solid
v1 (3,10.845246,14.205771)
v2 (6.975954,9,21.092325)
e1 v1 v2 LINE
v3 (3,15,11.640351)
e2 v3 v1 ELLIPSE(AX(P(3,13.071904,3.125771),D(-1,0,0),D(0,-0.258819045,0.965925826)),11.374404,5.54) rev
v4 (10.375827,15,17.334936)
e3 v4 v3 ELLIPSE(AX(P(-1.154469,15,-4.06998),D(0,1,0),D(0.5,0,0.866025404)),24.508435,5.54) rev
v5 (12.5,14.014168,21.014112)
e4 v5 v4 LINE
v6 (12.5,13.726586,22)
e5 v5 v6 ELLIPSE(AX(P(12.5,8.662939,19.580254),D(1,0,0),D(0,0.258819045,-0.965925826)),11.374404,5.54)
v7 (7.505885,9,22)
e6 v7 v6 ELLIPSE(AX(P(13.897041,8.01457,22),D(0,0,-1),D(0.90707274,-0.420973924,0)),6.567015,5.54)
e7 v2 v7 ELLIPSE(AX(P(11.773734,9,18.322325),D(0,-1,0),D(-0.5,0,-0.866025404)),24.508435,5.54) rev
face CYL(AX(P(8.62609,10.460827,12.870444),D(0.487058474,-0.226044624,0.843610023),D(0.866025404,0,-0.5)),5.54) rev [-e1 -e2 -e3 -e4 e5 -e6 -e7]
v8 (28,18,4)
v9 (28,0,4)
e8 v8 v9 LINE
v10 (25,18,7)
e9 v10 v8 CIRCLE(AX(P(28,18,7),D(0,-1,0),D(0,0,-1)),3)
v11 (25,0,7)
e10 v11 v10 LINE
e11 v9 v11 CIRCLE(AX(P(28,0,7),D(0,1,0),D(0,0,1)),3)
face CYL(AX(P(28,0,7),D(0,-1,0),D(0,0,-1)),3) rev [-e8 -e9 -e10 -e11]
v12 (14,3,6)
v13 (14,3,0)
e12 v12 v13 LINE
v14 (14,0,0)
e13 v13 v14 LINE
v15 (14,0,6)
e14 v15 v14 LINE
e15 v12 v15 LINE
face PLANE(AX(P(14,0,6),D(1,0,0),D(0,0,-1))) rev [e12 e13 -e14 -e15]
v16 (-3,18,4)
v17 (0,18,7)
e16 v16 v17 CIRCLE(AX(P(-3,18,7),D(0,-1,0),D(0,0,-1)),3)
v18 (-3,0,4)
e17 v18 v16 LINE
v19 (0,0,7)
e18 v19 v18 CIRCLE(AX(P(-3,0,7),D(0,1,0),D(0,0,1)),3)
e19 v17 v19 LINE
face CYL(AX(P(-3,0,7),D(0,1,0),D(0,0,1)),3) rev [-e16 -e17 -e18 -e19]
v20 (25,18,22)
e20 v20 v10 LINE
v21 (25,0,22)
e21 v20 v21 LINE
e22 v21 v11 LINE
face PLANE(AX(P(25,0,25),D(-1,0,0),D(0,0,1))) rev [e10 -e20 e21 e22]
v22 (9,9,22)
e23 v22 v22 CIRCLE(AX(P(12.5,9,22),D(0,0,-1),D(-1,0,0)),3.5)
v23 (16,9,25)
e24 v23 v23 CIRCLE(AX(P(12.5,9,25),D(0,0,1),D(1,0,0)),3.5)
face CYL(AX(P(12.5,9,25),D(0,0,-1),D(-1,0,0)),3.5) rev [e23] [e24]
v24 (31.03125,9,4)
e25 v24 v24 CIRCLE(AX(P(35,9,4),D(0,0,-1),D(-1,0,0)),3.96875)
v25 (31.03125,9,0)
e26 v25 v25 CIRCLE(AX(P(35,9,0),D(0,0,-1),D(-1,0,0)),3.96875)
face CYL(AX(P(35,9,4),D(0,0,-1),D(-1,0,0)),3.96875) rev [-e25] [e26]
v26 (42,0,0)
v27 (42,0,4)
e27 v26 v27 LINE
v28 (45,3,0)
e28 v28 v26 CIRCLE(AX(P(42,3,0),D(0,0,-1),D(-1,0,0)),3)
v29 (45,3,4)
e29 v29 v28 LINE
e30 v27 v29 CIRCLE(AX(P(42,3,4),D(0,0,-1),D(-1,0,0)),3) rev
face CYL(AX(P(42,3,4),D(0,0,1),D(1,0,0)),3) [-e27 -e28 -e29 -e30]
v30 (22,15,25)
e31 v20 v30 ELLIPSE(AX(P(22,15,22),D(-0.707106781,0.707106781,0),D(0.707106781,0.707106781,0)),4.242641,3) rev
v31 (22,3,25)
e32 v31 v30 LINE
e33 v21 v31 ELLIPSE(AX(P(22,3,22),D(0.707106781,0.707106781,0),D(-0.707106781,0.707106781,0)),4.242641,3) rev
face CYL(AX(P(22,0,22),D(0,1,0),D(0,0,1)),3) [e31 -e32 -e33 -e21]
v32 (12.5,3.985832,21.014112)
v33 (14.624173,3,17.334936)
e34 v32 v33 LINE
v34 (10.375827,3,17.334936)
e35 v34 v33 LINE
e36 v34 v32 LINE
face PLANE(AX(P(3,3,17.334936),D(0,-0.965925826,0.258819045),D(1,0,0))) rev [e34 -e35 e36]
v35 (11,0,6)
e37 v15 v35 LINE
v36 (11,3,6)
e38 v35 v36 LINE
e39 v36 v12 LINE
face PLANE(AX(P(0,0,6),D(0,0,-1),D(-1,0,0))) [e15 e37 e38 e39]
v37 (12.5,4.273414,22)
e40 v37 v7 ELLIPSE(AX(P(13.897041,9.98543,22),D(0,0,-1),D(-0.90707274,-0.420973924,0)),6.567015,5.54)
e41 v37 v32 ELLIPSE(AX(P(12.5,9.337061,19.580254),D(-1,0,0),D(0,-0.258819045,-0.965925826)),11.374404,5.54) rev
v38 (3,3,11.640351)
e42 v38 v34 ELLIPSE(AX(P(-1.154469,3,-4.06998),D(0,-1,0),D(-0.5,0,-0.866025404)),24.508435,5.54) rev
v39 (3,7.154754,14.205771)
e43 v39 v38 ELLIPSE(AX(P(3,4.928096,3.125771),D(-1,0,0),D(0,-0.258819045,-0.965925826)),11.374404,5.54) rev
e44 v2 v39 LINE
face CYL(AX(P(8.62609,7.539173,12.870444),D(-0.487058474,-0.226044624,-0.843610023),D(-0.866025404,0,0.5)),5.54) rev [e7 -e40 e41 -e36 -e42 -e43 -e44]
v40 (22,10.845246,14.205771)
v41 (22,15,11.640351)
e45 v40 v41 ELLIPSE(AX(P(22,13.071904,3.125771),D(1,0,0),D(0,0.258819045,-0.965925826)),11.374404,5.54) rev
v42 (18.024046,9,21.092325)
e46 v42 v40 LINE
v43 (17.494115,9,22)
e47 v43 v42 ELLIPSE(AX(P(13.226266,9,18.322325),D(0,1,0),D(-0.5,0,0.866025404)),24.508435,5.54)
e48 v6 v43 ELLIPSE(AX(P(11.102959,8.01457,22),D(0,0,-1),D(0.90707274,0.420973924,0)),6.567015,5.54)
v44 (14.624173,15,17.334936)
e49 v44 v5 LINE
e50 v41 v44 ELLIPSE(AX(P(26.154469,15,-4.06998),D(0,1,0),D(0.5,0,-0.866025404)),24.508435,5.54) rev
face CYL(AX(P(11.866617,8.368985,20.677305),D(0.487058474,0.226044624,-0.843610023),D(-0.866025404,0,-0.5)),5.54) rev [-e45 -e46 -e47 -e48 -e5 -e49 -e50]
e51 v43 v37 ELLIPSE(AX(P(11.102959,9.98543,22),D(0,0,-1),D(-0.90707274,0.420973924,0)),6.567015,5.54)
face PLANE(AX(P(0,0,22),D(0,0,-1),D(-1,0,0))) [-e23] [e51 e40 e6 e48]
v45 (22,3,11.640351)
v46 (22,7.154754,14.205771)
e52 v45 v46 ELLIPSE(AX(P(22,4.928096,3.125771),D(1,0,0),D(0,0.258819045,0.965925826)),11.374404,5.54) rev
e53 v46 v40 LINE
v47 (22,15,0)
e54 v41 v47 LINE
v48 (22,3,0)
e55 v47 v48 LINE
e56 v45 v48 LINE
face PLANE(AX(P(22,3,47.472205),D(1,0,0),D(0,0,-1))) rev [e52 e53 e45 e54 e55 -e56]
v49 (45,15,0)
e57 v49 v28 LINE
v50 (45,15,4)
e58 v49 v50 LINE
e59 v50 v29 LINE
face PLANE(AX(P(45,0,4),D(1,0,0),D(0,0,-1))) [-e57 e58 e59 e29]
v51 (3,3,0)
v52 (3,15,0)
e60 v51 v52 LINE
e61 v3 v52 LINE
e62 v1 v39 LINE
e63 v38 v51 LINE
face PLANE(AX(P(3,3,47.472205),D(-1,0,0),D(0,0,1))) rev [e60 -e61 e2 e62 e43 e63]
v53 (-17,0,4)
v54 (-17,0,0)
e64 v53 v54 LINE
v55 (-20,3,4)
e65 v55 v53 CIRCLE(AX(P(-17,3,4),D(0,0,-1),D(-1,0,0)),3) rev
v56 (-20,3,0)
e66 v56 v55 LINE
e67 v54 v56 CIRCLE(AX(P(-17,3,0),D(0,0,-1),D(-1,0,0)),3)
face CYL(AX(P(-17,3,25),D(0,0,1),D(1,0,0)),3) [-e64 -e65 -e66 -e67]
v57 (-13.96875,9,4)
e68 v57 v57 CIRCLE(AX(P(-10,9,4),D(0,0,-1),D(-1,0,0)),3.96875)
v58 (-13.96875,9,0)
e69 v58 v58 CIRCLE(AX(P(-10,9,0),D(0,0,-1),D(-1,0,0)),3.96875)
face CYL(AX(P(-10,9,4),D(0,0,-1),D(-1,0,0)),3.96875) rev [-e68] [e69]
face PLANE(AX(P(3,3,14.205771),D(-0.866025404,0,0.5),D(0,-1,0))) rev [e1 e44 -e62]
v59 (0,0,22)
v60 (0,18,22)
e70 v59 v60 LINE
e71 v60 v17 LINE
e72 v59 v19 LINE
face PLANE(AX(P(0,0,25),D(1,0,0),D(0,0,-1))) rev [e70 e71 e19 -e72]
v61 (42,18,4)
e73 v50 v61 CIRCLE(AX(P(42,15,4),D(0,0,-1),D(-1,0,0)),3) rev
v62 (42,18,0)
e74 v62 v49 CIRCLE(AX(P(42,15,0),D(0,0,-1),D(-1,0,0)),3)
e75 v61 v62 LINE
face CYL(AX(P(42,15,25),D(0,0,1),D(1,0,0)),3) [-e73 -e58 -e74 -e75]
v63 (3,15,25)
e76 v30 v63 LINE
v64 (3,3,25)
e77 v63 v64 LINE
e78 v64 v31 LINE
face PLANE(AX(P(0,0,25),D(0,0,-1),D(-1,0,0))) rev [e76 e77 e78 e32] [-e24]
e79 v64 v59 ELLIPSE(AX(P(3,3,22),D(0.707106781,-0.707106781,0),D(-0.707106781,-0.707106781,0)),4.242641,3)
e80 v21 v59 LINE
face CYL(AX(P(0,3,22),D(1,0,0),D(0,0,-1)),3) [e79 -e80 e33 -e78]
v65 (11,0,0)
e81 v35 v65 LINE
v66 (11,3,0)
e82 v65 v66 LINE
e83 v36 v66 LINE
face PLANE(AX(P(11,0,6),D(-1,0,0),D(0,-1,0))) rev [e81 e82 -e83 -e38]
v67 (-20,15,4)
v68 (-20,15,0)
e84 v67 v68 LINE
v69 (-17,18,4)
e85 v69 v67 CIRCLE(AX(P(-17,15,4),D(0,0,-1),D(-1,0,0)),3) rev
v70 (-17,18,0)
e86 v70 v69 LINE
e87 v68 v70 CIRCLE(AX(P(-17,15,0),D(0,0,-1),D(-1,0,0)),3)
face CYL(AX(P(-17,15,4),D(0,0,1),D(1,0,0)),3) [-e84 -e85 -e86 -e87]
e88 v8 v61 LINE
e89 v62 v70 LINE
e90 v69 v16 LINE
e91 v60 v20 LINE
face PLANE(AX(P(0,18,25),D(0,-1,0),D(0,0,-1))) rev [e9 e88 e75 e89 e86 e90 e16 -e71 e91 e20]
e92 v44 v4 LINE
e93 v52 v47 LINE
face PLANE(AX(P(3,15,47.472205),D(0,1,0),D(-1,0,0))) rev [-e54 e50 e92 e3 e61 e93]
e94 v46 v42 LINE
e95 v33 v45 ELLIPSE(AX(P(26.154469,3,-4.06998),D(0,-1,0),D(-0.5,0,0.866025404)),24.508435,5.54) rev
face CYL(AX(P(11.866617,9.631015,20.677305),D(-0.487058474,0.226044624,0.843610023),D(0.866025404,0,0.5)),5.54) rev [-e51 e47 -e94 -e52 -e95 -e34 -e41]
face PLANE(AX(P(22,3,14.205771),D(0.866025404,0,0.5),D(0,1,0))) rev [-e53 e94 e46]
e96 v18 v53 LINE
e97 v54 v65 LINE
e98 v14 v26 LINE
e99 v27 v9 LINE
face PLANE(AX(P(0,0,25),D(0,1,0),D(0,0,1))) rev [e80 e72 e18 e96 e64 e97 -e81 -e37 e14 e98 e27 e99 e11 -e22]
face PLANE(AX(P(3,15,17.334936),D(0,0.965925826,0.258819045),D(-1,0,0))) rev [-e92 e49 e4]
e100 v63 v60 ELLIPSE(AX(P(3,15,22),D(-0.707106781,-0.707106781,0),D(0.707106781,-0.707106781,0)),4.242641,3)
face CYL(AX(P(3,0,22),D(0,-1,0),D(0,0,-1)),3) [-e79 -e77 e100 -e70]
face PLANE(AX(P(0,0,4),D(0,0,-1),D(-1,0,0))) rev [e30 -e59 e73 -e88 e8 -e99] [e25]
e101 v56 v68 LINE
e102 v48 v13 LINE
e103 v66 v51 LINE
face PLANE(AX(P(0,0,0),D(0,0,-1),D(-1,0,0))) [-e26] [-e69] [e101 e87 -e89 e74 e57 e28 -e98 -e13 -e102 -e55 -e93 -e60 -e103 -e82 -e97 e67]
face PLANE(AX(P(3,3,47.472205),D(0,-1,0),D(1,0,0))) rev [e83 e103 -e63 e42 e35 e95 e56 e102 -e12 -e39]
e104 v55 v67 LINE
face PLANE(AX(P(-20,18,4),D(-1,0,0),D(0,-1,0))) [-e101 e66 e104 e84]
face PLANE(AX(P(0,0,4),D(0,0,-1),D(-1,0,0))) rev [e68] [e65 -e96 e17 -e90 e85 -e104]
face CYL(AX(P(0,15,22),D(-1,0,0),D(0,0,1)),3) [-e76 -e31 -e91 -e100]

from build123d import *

# Parameters (mm, degrees)
SKETCH1_W           = 25
SKETCH1_H           = 18
SKETCH1_R           = 3.5
BOSS_EXTRUDE1_DEPTH = 25
SKETCH2_W           = 20
SKETCH2_H           = 18
SKETCH2_R           = 3.96875
BOSS_EXTRUDE2_DEPTH = 4
FILLET2_R           = 3
FILLET4_R           = 3
SKETCH3_R           = 4.65
CUT_EXTRUDE1_DEPTH  = 22
SKETCH5_W           = 19
SKETCH5_H           = 12
CUT_EXTRUDE2_DEPTH  = 22
CHAMFER1_SIZE       = 1.25
CHAMFER1_SIZE2      = 4.665063509
CHAMFER2_SIZE       = 4.5
CHAMFER2_SIZE2      = 7.794228634
FILLET5_R           = 5.54
SKETCH7_W           = 3
SKETCH7_H           = 3
CUT_EXTRUDE3_DEPTH  = 6


with BuildPart() as part:
    # Sketch1 → Boss-Extrude1 (new body)
    with BuildSketch(Plane.XY):
        with Locations((12.5, 9)):
            Rectangle(SKETCH1_W, SKETCH1_H)
        with Locations((12.5, 9)):
            Circle(SKETCH1_R, mode=Mode.SUBTRACT)
    extrude(amount=BOSS_EXTRUDE1_DEPTH)

    # Sketch2 → Boss-Extrude2 (add)
    # profile 1 of 2: a face of its own
    with BuildSketch(Plane(origin=(0, 0, 0), x_dir=(-1, 0, 0), z_dir=(0, 0, -1))):
        with Locations((10, 9)):
            Rectangle(SKETCH2_W, SKETCH2_H)
        with Locations((10, 9)):
            Circle(SKETCH2_R, mode=Mode.SUBTRACT)
    # profile 2 of 2: a face of its own
    with BuildSketch(Plane(origin=(0, 0, 0), x_dir=(-1, 0, 0), z_dir=(0, 0, -1))):
        with Locations((-35, 9)):
            Rectangle(SKETCH2_W, SKETCH2_H)
        with Locations((-35, 9)):
            Circle(SKETCH2_R, mode=Mode.SUBTRACT)
    extrude(amount=-BOSS_EXTRUDE2_DEPTH)

    # Fillet2
    fillet2_edges = [part.edges().sort_by_distance(p)[0] for p in [
        (0, 9, 4),
        (-20, 0, 2),
        (-20, 18, 2),
        (45, 0, 2),
        (45, 18, 2),
        (25, 9, 4),
    ]]
    fillet(fillet2_edges, radius=FILLET2_R)

    # Fillet4
    fillet4_edges = [part.edges().sort_by_distance(p)[0] for p in [
        (12.5, 0, 25),
        (12.5, 18, 25),
        (0, 9, 25),
        (25, 9, 25),
    ]]
    fillet(fillet4_edges, radius=FILLET4_R)

    # Sketch3 → Cut-Extrude1 (cut)
    with BuildSketch(Plane(origin=(0, 0, 0), x_dir=(-1, 0, 0), z_dir=(0, 0, -1))):
        with Locations((-12.5, 9)):
            Circle(SKETCH3_R)
    extrude(amount=-CUT_EXTRUDE1_DEPTH, mode=Mode.SUBTRACT)

    # Sketch5 → Cut-Extrude2 (cut)
    with BuildSketch(Plane(origin=(0, 0, 0), x_dir=(-1, 0, 0), z_dir=(0, 0, -1))):
        with Locations((-12.5, 9)):
            Rectangle(SKETCH5_W, SKETCH5_H)
    extrude(amount=-CUT_EXTRUDE2_DEPTH, mode=Mode.SUBTRACT)

    # Chamfer1
    chamfer1_edges = [part.edges().sort_by_distance(p)[0] for p in [
        (12.5, 3, 22),
        (12.5, 15, 22),
    ]]
    chamfer1_side = [part.faces().sort_by_distance(p)[0] for p in [
        (12.5, 3.224722051, 22),
    ]]
    chamfer(chamfer1_edges, length=CHAMFER1_SIZE, length2=CHAMFER1_SIZE2, reference=chamfer1_side[0])

    # Chamfer2
    chamfer2_edges = [part.edges().sort_by_distance(p)[0] for p in [
        (22, 9, 22),
        (3, 9, 22),
    ]]
    chamfer2_side = [part.faces().sort_by_distance(p)[0] for p in [
        (21.787573542, 9, 22),
    ]]
    chamfer(chamfer2_edges, length=CHAMFER2_SIZE, length2=CHAMFER2_SIZE2, reference=chamfer2_side[0])

    # Fillet5
    # the kernel refuses this fillet: 5.54 mm, written as the material it adds along each edge
    with BuildSketch(Plane(origin=(13.422596023, 6.99868638, 32.258237225), x_dir=(-0.11302231218972587, 0.9741169476962979, -0.19576038710151827), z_dir=(-0.48705847384814693, -0.22604462437945333, -0.8436100229619524))) as fillet5_piece_1_section:
        with BuildLine():
            CenterArc((FILLET5_R * 0.877973148149, FILLET5_R), FILLET5_R, 187.435472226, 82.564527774)
            Line((-FILLET5_R * 0.113618085915, FILLET5_R * 0.870590477449), (0, 0))
            Line((0, 0), (FILLET5_R * 0.877973148149, 0))
        make_face()
    fillet5_piece_1 = extrude(amount=29.849737763, mode=Mode.PRIVATE)
    fillet5_piece_1 = split(fillet5_piece_1, bisect_by=Plane(origin=(6.414237593, 4.456810382, 22), z_dir=(0, 0, -1)), keep=Keep.TOP, mode=Mode.PRIVATE)
    fillet5_piece_1 = split(fillet5_piece_1, bisect_by=Plane(origin=(6.414237593, 0, 18.189685112), z_dir=(0, 1, 0)), keep=Keep.TOP, mode=Mode.PRIVATE)
    fillet5_piece_1 = split(fillet5_piece_1, bisect_by=Plane(origin=(0, 4.456810382, 18.189685112), z_dir=(1, 0, 0)), keep=Keep.TOP, mode=Mode.PRIVATE)
    add(fillet5_piece_1)
    with BuildSketch(Plane(origin=(11.577403977, 6.99868638, 32.258237225), x_dir=(-0.8733693623277119, -0.12606000911046675, -0.4704623588028643), z_dir=(0.48705847384814693, -0.2260446243794534, -0.8436100229619524))) as fillet5_piece_2_section:
        with BuildLine():
            CenterArc((FILLET5_R * 0.877973148149, FILLET5_R), FILLET5_R, 187.435472226, 82.564527774)
            Line((-FILLET5_R * 0.113618085915, FILLET5_R * 0.870590477449), (0, 0))
            Line((0, 0), (FILLET5_R * 0.877973148149, 0))
        make_face()
    fillet5_piece_2 = extrude(amount=29.849737763, mode=Mode.PRIVATE)
    fillet5_piece_2 = split(fillet5_piece_2, bisect_by=Plane(origin=(18.585762403, 4.456810384, 22), z_dir=(0, 0, -1)), keep=Keep.TOP, mode=Mode.PRIVATE)
    fillet5_piece_2 = split(fillet5_piece_2, bisect_by=Plane(origin=(18.585762403, 0, 18.189685124), z_dir=(0, 1, 0)), keep=Keep.TOP, mode=Mode.PRIVATE)
    fillet5_piece_2 = split(fillet5_piece_2, bisect_by=Plane(origin=(25, 4.456810384, 18.189685124), z_dir=(-1, 0, 0)), keep=Keep.TOP, mode=Mode.PRIVATE)
    add(fillet5_piece_2)
    with BuildSketch(Plane(origin=(11.577403977, 11.00131362, 32.258237225), x_dir=(0.11302231218972622, -0.9741169476962979, -0.19576038710151802), z_dir=(0.48705847384814693, 0.22604462437945327, -0.8436100229619524))) as fillet5_piece_3_section:
        with BuildLine():
            CenterArc((FILLET5_R * 0.877973148149, FILLET5_R), FILLET5_R, 187.435472226, 82.564527774)
            Line((-FILLET5_R * 0.113618085915, FILLET5_R * 0.870590477449), (0, 0))
            Line((0, 0), (FILLET5_R * 0.877973148149, 0))
        make_face()
    fillet5_piece_3 = extrude(amount=29.849737763, mode=Mode.PRIVATE)
    fillet5_piece_3 = split(fillet5_piece_3, bisect_by=Plane(origin=(18.585762407, 13.543189618, 22), z_dir=(0, 0, -1)), keep=Keep.TOP, mode=Mode.PRIVATE)
    fillet5_piece_3 = split(fillet5_piece_3, bisect_by=Plane(origin=(18.585762407, 18, 18.189685112), z_dir=(0, -1, 0)), keep=Keep.TOP, mode=Mode.PRIVATE)
    fillet5_piece_3 = split(fillet5_piece_3, bisect_by=Plane(origin=(25, 13.543189618, 18.189685112), z_dir=(-1, 0, 0)), keep=Keep.TOP, mode=Mode.PRIVATE)
    add(fillet5_piece_3)
    with BuildSketch(Plane(origin=(13.422596023, 11.00131362, 32.258237225), x_dir=(-0.11302231218972594, -0.9741169476962979, -0.1957603871015184), z_dir=(-0.4870584738481469, 0.22604462437945344, -0.8436100229619524))) as fillet5_piece_4_section:
        with BuildLine():
            CenterArc((FILLET5_R * 0.877973148149, -FILLET5_R), FILLET5_R, 90, 82.564527774)
            Line((-FILLET5_R * 0.113618085915, -FILLET5_R * 0.870590477449), (0, 0))
            Line((0, 0), (FILLET5_R * 0.877973148149, 0))
        make_face()
    fillet5_piece_4 = extrude(amount=29.849737763, mode=Mode.PRIVATE)
    fillet5_piece_4 = split(fillet5_piece_4, bisect_by=Plane(origin=(6.414237593, 13.543189618, 22), z_dir=(0, 0, -1)), keep=Keep.TOP, mode=Mode.PRIVATE)
    fillet5_piece_4 = split(fillet5_piece_4, bisect_by=Plane(origin=(6.414237593, 18, 18.189685112), z_dir=(0, -1, 0)), keep=Keep.TOP, mode=Mode.PRIVATE)
    fillet5_piece_4 = split(fillet5_piece_4, bisect_by=Plane(origin=(0, 13.543189618, 18.189685112), z_dir=(1, 0, 0)), keep=Keep.TOP, mode=Mode.PRIVATE)
    add(fillet5_piece_4)

    # Sketch7 → Cut-Extrude3 (cut)
    with BuildSketch(Plane(origin=(0, 0, 0), x_dir=(-1, 0, 0), z_dir=(0, 0, -1))):
        with Locations((-12.5, 1.5)):
            Rectangle(SKETCH7_W, SKETCH7_H)
    extrude(amount=-CUT_EXTRUDE3_DEPTH, mode=Mode.SUBTRACT)


solid = part.part
